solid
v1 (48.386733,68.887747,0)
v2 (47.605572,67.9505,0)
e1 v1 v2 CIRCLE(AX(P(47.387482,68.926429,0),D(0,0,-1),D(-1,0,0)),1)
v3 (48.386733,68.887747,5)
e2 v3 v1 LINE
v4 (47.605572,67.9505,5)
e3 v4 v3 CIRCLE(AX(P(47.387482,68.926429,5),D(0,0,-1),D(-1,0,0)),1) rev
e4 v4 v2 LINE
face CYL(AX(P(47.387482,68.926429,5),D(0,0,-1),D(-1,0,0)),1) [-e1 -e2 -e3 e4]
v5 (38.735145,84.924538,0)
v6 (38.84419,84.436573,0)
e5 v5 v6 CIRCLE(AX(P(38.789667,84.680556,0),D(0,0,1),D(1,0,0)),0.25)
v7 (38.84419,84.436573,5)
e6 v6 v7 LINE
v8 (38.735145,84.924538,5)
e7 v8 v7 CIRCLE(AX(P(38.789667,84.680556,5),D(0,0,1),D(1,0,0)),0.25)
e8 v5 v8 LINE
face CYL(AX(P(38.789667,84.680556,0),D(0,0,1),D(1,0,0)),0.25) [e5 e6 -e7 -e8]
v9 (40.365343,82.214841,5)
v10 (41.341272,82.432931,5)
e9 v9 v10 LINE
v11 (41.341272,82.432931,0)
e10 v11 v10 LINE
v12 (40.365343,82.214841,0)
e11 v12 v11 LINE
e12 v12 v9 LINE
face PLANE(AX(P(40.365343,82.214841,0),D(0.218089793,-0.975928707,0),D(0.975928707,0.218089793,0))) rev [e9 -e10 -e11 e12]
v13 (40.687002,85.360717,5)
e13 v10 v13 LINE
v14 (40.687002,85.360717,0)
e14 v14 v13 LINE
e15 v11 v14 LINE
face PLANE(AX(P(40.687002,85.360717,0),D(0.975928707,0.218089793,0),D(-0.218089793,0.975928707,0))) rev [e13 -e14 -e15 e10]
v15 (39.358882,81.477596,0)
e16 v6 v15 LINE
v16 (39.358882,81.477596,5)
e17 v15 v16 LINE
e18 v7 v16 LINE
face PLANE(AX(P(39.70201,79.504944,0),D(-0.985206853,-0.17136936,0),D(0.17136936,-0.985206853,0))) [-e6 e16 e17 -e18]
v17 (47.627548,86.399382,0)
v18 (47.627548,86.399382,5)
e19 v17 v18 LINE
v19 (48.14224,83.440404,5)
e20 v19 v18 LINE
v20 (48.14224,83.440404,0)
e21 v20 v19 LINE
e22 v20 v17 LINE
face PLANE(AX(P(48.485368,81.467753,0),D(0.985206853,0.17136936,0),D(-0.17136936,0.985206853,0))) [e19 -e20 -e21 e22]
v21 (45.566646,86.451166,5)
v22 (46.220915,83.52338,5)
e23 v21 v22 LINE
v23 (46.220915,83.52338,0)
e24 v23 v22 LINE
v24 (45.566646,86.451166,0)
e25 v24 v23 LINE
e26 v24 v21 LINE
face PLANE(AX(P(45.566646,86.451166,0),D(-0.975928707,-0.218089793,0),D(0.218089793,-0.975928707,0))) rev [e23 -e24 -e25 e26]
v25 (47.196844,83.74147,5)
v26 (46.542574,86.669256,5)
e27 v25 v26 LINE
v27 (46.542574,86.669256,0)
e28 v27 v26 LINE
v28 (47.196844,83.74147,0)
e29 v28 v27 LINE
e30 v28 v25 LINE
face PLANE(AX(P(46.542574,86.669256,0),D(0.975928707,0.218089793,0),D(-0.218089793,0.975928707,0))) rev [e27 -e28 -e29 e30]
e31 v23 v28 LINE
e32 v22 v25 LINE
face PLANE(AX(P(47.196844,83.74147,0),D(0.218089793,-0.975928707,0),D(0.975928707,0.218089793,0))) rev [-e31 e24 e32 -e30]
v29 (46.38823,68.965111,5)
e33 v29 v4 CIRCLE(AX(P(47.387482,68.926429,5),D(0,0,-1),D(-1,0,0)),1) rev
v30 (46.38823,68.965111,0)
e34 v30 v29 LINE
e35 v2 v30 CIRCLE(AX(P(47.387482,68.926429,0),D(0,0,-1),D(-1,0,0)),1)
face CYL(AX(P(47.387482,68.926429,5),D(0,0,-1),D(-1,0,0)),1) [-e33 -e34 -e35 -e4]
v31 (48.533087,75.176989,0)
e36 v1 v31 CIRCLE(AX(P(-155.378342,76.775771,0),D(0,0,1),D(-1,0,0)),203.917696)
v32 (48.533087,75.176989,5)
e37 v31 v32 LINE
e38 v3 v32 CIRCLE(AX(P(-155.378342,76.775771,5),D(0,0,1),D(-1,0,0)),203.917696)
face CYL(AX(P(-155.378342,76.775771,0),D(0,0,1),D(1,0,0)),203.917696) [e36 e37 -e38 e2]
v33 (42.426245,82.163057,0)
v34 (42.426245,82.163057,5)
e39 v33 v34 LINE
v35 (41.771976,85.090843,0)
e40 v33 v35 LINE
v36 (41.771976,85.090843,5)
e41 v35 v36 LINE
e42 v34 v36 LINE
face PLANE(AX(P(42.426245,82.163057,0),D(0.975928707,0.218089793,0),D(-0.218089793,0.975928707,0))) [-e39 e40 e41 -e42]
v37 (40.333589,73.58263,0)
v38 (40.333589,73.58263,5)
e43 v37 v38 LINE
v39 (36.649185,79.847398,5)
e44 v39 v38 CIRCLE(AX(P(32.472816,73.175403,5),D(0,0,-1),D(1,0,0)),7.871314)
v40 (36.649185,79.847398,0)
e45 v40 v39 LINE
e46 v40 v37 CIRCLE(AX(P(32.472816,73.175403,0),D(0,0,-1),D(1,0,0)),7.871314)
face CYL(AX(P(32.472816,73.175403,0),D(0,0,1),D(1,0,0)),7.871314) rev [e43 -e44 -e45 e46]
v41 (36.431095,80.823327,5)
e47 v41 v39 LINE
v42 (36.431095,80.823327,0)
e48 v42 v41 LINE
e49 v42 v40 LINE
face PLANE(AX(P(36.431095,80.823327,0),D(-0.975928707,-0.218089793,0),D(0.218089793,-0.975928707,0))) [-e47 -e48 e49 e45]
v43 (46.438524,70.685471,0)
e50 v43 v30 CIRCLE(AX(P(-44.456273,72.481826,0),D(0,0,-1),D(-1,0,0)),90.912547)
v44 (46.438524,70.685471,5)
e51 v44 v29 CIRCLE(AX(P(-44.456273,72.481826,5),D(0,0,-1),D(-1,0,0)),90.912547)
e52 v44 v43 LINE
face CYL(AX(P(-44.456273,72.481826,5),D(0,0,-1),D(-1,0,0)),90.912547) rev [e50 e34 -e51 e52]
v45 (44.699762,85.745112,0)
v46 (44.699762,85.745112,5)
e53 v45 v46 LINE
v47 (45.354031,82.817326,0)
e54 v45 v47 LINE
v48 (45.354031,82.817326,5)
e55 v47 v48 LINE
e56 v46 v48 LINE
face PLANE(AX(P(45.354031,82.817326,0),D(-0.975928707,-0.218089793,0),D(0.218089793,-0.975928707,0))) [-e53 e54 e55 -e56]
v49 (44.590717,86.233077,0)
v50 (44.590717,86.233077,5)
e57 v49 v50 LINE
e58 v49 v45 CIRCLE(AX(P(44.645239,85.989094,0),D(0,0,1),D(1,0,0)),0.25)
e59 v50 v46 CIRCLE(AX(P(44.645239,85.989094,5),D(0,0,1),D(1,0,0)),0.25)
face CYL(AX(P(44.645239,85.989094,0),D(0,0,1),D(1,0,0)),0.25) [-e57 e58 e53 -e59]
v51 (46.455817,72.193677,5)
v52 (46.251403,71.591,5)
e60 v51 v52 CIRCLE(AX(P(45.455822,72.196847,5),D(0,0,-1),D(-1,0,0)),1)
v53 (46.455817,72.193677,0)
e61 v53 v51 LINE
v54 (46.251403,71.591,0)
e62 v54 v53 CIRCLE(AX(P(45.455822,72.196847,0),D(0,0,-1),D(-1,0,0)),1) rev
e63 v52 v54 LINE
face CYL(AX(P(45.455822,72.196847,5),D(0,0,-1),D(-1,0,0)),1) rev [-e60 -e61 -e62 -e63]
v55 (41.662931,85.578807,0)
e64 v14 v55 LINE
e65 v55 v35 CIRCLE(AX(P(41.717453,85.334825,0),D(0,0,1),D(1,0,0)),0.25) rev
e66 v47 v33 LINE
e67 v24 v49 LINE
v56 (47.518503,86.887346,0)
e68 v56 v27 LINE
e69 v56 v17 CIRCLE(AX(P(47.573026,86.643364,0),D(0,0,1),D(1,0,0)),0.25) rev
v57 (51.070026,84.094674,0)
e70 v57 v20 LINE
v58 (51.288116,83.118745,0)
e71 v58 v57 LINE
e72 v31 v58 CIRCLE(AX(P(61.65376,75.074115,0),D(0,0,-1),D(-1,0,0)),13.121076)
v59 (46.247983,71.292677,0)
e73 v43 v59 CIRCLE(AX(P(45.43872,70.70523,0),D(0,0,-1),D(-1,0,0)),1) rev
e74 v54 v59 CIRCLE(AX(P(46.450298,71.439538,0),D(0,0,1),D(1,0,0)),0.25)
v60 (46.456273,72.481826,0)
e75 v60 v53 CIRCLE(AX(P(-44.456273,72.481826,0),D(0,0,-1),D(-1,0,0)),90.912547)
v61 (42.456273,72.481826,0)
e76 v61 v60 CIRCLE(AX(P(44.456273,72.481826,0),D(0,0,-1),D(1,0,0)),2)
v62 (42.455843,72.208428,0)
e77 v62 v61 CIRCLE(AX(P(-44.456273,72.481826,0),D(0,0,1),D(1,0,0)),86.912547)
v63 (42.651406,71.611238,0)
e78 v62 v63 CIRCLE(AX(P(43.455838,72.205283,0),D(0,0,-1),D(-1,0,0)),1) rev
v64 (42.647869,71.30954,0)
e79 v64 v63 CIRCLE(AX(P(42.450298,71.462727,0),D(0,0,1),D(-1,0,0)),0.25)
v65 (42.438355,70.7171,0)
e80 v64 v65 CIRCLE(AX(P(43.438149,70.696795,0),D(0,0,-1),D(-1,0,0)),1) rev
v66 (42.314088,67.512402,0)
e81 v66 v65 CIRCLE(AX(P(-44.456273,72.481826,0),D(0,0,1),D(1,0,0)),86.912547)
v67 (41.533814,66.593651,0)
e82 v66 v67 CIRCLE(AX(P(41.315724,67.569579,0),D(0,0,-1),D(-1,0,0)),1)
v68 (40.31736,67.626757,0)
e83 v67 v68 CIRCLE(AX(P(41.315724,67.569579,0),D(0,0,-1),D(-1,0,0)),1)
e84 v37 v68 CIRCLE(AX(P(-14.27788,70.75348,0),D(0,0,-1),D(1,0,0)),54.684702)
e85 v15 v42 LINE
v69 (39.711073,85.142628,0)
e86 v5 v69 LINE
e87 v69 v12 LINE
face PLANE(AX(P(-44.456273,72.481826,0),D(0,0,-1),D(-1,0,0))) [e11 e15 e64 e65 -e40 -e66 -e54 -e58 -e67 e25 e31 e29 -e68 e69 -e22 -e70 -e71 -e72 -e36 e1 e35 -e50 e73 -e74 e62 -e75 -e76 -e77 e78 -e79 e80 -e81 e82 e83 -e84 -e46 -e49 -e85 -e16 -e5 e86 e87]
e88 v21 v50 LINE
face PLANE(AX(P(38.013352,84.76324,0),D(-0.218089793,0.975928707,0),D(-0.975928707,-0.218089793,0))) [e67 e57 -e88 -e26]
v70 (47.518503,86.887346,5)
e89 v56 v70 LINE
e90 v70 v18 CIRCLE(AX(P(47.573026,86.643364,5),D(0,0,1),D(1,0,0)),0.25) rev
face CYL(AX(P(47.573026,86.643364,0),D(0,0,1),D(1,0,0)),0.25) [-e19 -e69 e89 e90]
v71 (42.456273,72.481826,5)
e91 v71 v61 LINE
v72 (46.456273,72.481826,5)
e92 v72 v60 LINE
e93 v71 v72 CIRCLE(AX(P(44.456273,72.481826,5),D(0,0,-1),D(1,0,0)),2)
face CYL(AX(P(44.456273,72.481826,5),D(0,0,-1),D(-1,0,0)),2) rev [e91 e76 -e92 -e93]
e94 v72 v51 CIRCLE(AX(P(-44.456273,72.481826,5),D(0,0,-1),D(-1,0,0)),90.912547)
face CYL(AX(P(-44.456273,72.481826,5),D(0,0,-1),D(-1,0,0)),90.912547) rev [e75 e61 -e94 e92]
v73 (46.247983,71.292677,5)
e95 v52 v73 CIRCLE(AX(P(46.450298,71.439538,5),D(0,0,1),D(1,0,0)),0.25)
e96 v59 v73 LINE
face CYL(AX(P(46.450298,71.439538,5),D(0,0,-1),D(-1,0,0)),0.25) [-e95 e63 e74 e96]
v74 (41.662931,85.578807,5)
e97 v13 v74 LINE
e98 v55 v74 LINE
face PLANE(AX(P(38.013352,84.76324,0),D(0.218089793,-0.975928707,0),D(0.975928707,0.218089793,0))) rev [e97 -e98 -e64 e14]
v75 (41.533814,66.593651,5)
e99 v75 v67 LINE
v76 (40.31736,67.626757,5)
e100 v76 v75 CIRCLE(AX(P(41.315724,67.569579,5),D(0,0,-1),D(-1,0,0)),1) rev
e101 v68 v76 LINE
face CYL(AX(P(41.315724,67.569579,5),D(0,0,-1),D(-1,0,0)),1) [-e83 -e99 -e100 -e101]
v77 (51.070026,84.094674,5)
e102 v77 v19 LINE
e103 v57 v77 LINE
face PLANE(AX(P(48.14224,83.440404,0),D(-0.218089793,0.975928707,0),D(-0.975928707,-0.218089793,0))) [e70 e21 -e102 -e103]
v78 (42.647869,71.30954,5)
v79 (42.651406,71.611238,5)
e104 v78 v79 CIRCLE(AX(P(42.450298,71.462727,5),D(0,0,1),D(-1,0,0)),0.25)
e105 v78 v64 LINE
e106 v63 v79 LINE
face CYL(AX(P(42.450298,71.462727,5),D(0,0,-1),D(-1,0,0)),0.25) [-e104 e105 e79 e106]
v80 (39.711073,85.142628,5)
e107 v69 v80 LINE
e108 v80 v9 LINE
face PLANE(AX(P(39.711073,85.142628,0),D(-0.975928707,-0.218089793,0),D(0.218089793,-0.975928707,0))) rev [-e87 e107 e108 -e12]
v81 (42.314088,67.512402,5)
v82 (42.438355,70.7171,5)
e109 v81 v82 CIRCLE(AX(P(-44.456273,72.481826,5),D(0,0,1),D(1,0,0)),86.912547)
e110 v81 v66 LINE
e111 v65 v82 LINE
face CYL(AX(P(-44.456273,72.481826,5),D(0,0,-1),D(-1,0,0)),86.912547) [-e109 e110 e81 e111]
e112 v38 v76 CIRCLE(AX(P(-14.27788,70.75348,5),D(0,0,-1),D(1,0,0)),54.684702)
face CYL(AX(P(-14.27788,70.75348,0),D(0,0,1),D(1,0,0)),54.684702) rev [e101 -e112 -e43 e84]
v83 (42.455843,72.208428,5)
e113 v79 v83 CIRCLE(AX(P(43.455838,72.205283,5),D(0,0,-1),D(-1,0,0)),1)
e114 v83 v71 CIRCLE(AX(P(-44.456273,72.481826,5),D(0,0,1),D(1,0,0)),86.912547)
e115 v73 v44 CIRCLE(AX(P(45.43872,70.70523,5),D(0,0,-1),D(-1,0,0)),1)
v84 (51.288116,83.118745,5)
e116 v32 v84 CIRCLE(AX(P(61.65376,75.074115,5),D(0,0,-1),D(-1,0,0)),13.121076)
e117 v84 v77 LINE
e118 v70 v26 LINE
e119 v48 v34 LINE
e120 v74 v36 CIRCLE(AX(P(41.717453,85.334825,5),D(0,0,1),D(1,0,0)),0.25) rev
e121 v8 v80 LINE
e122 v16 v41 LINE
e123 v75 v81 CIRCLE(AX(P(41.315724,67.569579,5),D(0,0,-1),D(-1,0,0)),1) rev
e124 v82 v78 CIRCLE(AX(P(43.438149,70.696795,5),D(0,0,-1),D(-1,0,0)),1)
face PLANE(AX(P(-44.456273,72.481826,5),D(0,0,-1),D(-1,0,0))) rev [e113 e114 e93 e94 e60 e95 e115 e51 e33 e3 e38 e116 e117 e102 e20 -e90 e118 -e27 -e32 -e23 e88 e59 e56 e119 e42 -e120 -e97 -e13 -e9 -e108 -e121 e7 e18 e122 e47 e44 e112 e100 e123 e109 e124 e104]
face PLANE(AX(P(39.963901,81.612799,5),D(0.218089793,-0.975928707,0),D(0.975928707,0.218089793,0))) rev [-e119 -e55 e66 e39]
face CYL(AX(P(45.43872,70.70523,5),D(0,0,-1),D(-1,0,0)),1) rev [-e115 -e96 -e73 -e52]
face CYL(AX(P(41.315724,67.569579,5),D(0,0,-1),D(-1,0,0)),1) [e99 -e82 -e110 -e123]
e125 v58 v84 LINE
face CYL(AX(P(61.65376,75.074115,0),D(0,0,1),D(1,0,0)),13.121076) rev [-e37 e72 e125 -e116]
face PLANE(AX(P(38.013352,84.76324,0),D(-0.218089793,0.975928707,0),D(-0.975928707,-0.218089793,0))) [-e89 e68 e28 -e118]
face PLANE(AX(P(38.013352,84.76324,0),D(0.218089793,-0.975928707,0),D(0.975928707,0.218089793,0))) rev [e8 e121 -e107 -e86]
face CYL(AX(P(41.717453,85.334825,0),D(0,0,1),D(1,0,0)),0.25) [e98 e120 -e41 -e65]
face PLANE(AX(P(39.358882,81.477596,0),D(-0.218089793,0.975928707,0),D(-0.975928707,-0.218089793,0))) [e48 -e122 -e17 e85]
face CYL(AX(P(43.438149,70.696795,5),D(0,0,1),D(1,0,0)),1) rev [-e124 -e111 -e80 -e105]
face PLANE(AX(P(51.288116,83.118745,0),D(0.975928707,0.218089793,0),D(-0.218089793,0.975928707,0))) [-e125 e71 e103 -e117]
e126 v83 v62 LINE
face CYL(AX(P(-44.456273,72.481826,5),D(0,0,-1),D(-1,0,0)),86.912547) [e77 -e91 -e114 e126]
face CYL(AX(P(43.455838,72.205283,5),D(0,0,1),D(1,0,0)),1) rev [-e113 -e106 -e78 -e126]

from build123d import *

# Parameters (mm, degrees)
BOSS_EXTRUDE1_DEPTH = 5
FILLET1_R           = 1
FILLET2_R           = 1
BOSS_EXTRUDE2_DEPTH = 5
BOSS_EXTRUDE3_DEPTH = 5
CUT_EXTRUDE1_DEPTH  = 5
BOSS_EXTRUDE4_DEPTH = 5


with BuildPart() as part:
    # Sketch1 → Boss-Extrude1 (new body)
    with BuildSketch(Plane.XY):
        with BuildLine():
            Line((46.328585563, 67.665133516), (48.353724123, 68.117689166))
            ThreePointArc((48.353724123, 68.117689166), (48.398647133, 75.753686317), (47.81637492, 83.367583456))
            Line((47.81637492, 83.367583456), (39.963901457, 81.612799216))
            ThreePointArc((39.963901457, 81.612799216), (40.443341541, 73.963706944), (40.231134371, 66.302542314))
            Line((40.231134371, 66.302542314), (42.267565607, 66.757621526))
            ThreePointArc((42.267565607, 66.757621526), (42.38586051, 68.984034012), (42.447007404, 71.212748282))
            ThreePointArc((42.447007404, 71.212748282), (42.700281141, 71.459795226), (42.452870187, 71.712713391))
            ThreePointArc((42.452870187, 71.712713391), (42.455422518, 72.097266143), (42.4562733, 72.481826424))
            ThreePointArc((42.4562733, 72.481826424), (44.4562733, 74.481826424), (46.4562733, 72.481826424))
            ThreePointArc((46.4562733, 72.481826424), (46.455410169, 72.085672321), (46.452820794, 71.68952574))
            ThreePointArc((46.452820794, 71.68952574), (46.200314758, 71.442404649), (46.447088433, 71.189559074))
            ThreePointArc((46.447088433, 71.189559074), (46.404927274, 69.426771663), (46.328585563, 67.665133516))
        make_face()
    extrude(amount=BOSS_EXTRUDE1_DEPTH)

    # Fillet1
    fillet1_edges = [part.edges().sort_by_distance(p)[0] for p in [
        (46.447088433, 71.189559074, 2.5),
        (46.452820794, 71.68952574, 2.5),
        (42.452870187, 71.712713391, 2.5),
        (42.447007404, 71.212748282, 2.5),
    ]]
    fillet(fillet1_edges, radius=FILLET1_R)

    # Fillet2
    fillet2_edges = [part.edges().sort_by_distance(p)[0] for p in [
        (48.353724123, 68.117689166, 2.5),
        (46.328585563, 67.665133516, 2.5),
        (42.267565607, 66.757621526, 2.5),
        (40.231134371, 66.302542314, 2.5),
    ]]
    fillet(fillet2_edges, radius=FILLET2_R - 0.0001)  # a hair under: the kernel refuses the full size

    # Sketch2 → Boss-Extrude2 (add)
    with BuildSketch(Plane.XY.offset(5)):
        with BuildLine():
            Line((39.70200957, 79.50494448), (38.844189625, 84.436573388))
            Line((38.844189625, 84.436573388), (41.771975747, 85.090842768))
            Line((41.771975747, 85.090842768), (42.426245127, 82.163056646))
            Line((42.426245127, 82.163056646), (40.317359796, 67.626756722))
            ThreePointArc((40.317359796, 67.626756722), (40.333588714, 73.582630469), (39.70200957, 79.50494448))
        make_face()
        with BuildLine():
            Line((48.485367937, 81.467752621), (47.627547992, 86.399381529))
            Line((47.627547992, 86.399381529), (44.699761869, 85.745112148))
            Line((44.699761869, 85.745112148), (45.35403125, 82.817326026))
            Line((45.35403125, 82.817326026), (48.38673347, 68.887746621))
            ThreePointArc((48.38673347, 68.887746621), (48.533086838, 75.176988802), (48.485367937, 81.467752621))
        make_face()
    extrude(amount=-BOSS_EXTRUDE2_DEPTH)

    # Sketch3 → Boss-Extrude3 (add)
    with BuildSketch(Plane.XY.offset(5)):
        with BuildLine():
            ThreePointArc((41.66293085, 85.578807122), (41.961435476, 85.389347393), (41.771975747, 85.090842768))
            Line((41.771975747, 85.090842768), (38.844189625, 84.436573388))
            ThreePointArc((38.844189625, 84.436573388), (38.545685, 84.626033116), (38.735144728, 84.924537741))
            Line((38.735144728, 84.924537741), (41.66293085, 85.578807122))
        make_face()
        with BuildLine():
            ThreePointArc((47.518503095, 86.887345882), (47.81700772, 86.697886154), (47.627547992, 86.399381529))
            Line((47.627547992, 86.399381529), (44.699761869, 85.745112148))
            ThreePointArc((44.699761869, 85.745112148), (44.401257244, 85.934571877), (44.590716973, 86.233076502))
            Line((44.590716973, 86.233076502), (47.518503095, 86.887345882))
        make_face()
    extrude(amount=-BOSS_EXTRUDE3_DEPTH)

    # Sketch4 → Cut-Extrude1 (cut)
    with BuildSketch(Plane.XY.offset(5)):
        Polygon((39.711073435, 85.142627535), (40.365342816, 82.214841413), (41.341271523, 82.432931206), (40.687002143, 85.360717328), align=None)
        Polygon((46.542574388, 86.669256089), (45.56664568, 86.451166295), (46.22091506, 83.523380173), (47.196843768, 83.741469966), align=None)
    extrude(amount=-CUT_EXTRUDE1_DEPTH, mode=Mode.SUBTRACT)

    # Sketch5 → Boss-Extrude4 (add)
    with BuildSketch(Plane.XY.offset(5)):
        with BuildLine():
            Line((39.358881592, 81.477596043), (36.43109547, 80.823326663))
            Line((36.43109547, 80.823326663), (36.649185263, 79.847397955))
            ThreePointArc((36.649185263, 79.847397955), (39.257727558, 77.165710562), (40.333588714, 73.582630469))
            Line((40.333588714, 73.582630469), (44.031942568, 76.908555657))
            Line((44.031942568, 76.908555657), (48.533086838, 75.176988802))
            ThreePointArc((48.533086838, 75.176988802), (49.257403766, 79.374463858), (51.288115875, 83.118744857))
            Line((51.288115875, 83.118744857), (51.070026081, 84.094673564))
            Line((51.070026081, 84.094673564), (48.142239959, 83.440404184))
            Line((48.142239959, 83.440404184), (46.362753702, 81.840114326))
            Line((46.362753702, 81.840114326), (39.358881592, 81.477596043))
        make_face()
    extrude(amount=-BOSS_EXTRUDE4_DEPTH)


solid = part.part
